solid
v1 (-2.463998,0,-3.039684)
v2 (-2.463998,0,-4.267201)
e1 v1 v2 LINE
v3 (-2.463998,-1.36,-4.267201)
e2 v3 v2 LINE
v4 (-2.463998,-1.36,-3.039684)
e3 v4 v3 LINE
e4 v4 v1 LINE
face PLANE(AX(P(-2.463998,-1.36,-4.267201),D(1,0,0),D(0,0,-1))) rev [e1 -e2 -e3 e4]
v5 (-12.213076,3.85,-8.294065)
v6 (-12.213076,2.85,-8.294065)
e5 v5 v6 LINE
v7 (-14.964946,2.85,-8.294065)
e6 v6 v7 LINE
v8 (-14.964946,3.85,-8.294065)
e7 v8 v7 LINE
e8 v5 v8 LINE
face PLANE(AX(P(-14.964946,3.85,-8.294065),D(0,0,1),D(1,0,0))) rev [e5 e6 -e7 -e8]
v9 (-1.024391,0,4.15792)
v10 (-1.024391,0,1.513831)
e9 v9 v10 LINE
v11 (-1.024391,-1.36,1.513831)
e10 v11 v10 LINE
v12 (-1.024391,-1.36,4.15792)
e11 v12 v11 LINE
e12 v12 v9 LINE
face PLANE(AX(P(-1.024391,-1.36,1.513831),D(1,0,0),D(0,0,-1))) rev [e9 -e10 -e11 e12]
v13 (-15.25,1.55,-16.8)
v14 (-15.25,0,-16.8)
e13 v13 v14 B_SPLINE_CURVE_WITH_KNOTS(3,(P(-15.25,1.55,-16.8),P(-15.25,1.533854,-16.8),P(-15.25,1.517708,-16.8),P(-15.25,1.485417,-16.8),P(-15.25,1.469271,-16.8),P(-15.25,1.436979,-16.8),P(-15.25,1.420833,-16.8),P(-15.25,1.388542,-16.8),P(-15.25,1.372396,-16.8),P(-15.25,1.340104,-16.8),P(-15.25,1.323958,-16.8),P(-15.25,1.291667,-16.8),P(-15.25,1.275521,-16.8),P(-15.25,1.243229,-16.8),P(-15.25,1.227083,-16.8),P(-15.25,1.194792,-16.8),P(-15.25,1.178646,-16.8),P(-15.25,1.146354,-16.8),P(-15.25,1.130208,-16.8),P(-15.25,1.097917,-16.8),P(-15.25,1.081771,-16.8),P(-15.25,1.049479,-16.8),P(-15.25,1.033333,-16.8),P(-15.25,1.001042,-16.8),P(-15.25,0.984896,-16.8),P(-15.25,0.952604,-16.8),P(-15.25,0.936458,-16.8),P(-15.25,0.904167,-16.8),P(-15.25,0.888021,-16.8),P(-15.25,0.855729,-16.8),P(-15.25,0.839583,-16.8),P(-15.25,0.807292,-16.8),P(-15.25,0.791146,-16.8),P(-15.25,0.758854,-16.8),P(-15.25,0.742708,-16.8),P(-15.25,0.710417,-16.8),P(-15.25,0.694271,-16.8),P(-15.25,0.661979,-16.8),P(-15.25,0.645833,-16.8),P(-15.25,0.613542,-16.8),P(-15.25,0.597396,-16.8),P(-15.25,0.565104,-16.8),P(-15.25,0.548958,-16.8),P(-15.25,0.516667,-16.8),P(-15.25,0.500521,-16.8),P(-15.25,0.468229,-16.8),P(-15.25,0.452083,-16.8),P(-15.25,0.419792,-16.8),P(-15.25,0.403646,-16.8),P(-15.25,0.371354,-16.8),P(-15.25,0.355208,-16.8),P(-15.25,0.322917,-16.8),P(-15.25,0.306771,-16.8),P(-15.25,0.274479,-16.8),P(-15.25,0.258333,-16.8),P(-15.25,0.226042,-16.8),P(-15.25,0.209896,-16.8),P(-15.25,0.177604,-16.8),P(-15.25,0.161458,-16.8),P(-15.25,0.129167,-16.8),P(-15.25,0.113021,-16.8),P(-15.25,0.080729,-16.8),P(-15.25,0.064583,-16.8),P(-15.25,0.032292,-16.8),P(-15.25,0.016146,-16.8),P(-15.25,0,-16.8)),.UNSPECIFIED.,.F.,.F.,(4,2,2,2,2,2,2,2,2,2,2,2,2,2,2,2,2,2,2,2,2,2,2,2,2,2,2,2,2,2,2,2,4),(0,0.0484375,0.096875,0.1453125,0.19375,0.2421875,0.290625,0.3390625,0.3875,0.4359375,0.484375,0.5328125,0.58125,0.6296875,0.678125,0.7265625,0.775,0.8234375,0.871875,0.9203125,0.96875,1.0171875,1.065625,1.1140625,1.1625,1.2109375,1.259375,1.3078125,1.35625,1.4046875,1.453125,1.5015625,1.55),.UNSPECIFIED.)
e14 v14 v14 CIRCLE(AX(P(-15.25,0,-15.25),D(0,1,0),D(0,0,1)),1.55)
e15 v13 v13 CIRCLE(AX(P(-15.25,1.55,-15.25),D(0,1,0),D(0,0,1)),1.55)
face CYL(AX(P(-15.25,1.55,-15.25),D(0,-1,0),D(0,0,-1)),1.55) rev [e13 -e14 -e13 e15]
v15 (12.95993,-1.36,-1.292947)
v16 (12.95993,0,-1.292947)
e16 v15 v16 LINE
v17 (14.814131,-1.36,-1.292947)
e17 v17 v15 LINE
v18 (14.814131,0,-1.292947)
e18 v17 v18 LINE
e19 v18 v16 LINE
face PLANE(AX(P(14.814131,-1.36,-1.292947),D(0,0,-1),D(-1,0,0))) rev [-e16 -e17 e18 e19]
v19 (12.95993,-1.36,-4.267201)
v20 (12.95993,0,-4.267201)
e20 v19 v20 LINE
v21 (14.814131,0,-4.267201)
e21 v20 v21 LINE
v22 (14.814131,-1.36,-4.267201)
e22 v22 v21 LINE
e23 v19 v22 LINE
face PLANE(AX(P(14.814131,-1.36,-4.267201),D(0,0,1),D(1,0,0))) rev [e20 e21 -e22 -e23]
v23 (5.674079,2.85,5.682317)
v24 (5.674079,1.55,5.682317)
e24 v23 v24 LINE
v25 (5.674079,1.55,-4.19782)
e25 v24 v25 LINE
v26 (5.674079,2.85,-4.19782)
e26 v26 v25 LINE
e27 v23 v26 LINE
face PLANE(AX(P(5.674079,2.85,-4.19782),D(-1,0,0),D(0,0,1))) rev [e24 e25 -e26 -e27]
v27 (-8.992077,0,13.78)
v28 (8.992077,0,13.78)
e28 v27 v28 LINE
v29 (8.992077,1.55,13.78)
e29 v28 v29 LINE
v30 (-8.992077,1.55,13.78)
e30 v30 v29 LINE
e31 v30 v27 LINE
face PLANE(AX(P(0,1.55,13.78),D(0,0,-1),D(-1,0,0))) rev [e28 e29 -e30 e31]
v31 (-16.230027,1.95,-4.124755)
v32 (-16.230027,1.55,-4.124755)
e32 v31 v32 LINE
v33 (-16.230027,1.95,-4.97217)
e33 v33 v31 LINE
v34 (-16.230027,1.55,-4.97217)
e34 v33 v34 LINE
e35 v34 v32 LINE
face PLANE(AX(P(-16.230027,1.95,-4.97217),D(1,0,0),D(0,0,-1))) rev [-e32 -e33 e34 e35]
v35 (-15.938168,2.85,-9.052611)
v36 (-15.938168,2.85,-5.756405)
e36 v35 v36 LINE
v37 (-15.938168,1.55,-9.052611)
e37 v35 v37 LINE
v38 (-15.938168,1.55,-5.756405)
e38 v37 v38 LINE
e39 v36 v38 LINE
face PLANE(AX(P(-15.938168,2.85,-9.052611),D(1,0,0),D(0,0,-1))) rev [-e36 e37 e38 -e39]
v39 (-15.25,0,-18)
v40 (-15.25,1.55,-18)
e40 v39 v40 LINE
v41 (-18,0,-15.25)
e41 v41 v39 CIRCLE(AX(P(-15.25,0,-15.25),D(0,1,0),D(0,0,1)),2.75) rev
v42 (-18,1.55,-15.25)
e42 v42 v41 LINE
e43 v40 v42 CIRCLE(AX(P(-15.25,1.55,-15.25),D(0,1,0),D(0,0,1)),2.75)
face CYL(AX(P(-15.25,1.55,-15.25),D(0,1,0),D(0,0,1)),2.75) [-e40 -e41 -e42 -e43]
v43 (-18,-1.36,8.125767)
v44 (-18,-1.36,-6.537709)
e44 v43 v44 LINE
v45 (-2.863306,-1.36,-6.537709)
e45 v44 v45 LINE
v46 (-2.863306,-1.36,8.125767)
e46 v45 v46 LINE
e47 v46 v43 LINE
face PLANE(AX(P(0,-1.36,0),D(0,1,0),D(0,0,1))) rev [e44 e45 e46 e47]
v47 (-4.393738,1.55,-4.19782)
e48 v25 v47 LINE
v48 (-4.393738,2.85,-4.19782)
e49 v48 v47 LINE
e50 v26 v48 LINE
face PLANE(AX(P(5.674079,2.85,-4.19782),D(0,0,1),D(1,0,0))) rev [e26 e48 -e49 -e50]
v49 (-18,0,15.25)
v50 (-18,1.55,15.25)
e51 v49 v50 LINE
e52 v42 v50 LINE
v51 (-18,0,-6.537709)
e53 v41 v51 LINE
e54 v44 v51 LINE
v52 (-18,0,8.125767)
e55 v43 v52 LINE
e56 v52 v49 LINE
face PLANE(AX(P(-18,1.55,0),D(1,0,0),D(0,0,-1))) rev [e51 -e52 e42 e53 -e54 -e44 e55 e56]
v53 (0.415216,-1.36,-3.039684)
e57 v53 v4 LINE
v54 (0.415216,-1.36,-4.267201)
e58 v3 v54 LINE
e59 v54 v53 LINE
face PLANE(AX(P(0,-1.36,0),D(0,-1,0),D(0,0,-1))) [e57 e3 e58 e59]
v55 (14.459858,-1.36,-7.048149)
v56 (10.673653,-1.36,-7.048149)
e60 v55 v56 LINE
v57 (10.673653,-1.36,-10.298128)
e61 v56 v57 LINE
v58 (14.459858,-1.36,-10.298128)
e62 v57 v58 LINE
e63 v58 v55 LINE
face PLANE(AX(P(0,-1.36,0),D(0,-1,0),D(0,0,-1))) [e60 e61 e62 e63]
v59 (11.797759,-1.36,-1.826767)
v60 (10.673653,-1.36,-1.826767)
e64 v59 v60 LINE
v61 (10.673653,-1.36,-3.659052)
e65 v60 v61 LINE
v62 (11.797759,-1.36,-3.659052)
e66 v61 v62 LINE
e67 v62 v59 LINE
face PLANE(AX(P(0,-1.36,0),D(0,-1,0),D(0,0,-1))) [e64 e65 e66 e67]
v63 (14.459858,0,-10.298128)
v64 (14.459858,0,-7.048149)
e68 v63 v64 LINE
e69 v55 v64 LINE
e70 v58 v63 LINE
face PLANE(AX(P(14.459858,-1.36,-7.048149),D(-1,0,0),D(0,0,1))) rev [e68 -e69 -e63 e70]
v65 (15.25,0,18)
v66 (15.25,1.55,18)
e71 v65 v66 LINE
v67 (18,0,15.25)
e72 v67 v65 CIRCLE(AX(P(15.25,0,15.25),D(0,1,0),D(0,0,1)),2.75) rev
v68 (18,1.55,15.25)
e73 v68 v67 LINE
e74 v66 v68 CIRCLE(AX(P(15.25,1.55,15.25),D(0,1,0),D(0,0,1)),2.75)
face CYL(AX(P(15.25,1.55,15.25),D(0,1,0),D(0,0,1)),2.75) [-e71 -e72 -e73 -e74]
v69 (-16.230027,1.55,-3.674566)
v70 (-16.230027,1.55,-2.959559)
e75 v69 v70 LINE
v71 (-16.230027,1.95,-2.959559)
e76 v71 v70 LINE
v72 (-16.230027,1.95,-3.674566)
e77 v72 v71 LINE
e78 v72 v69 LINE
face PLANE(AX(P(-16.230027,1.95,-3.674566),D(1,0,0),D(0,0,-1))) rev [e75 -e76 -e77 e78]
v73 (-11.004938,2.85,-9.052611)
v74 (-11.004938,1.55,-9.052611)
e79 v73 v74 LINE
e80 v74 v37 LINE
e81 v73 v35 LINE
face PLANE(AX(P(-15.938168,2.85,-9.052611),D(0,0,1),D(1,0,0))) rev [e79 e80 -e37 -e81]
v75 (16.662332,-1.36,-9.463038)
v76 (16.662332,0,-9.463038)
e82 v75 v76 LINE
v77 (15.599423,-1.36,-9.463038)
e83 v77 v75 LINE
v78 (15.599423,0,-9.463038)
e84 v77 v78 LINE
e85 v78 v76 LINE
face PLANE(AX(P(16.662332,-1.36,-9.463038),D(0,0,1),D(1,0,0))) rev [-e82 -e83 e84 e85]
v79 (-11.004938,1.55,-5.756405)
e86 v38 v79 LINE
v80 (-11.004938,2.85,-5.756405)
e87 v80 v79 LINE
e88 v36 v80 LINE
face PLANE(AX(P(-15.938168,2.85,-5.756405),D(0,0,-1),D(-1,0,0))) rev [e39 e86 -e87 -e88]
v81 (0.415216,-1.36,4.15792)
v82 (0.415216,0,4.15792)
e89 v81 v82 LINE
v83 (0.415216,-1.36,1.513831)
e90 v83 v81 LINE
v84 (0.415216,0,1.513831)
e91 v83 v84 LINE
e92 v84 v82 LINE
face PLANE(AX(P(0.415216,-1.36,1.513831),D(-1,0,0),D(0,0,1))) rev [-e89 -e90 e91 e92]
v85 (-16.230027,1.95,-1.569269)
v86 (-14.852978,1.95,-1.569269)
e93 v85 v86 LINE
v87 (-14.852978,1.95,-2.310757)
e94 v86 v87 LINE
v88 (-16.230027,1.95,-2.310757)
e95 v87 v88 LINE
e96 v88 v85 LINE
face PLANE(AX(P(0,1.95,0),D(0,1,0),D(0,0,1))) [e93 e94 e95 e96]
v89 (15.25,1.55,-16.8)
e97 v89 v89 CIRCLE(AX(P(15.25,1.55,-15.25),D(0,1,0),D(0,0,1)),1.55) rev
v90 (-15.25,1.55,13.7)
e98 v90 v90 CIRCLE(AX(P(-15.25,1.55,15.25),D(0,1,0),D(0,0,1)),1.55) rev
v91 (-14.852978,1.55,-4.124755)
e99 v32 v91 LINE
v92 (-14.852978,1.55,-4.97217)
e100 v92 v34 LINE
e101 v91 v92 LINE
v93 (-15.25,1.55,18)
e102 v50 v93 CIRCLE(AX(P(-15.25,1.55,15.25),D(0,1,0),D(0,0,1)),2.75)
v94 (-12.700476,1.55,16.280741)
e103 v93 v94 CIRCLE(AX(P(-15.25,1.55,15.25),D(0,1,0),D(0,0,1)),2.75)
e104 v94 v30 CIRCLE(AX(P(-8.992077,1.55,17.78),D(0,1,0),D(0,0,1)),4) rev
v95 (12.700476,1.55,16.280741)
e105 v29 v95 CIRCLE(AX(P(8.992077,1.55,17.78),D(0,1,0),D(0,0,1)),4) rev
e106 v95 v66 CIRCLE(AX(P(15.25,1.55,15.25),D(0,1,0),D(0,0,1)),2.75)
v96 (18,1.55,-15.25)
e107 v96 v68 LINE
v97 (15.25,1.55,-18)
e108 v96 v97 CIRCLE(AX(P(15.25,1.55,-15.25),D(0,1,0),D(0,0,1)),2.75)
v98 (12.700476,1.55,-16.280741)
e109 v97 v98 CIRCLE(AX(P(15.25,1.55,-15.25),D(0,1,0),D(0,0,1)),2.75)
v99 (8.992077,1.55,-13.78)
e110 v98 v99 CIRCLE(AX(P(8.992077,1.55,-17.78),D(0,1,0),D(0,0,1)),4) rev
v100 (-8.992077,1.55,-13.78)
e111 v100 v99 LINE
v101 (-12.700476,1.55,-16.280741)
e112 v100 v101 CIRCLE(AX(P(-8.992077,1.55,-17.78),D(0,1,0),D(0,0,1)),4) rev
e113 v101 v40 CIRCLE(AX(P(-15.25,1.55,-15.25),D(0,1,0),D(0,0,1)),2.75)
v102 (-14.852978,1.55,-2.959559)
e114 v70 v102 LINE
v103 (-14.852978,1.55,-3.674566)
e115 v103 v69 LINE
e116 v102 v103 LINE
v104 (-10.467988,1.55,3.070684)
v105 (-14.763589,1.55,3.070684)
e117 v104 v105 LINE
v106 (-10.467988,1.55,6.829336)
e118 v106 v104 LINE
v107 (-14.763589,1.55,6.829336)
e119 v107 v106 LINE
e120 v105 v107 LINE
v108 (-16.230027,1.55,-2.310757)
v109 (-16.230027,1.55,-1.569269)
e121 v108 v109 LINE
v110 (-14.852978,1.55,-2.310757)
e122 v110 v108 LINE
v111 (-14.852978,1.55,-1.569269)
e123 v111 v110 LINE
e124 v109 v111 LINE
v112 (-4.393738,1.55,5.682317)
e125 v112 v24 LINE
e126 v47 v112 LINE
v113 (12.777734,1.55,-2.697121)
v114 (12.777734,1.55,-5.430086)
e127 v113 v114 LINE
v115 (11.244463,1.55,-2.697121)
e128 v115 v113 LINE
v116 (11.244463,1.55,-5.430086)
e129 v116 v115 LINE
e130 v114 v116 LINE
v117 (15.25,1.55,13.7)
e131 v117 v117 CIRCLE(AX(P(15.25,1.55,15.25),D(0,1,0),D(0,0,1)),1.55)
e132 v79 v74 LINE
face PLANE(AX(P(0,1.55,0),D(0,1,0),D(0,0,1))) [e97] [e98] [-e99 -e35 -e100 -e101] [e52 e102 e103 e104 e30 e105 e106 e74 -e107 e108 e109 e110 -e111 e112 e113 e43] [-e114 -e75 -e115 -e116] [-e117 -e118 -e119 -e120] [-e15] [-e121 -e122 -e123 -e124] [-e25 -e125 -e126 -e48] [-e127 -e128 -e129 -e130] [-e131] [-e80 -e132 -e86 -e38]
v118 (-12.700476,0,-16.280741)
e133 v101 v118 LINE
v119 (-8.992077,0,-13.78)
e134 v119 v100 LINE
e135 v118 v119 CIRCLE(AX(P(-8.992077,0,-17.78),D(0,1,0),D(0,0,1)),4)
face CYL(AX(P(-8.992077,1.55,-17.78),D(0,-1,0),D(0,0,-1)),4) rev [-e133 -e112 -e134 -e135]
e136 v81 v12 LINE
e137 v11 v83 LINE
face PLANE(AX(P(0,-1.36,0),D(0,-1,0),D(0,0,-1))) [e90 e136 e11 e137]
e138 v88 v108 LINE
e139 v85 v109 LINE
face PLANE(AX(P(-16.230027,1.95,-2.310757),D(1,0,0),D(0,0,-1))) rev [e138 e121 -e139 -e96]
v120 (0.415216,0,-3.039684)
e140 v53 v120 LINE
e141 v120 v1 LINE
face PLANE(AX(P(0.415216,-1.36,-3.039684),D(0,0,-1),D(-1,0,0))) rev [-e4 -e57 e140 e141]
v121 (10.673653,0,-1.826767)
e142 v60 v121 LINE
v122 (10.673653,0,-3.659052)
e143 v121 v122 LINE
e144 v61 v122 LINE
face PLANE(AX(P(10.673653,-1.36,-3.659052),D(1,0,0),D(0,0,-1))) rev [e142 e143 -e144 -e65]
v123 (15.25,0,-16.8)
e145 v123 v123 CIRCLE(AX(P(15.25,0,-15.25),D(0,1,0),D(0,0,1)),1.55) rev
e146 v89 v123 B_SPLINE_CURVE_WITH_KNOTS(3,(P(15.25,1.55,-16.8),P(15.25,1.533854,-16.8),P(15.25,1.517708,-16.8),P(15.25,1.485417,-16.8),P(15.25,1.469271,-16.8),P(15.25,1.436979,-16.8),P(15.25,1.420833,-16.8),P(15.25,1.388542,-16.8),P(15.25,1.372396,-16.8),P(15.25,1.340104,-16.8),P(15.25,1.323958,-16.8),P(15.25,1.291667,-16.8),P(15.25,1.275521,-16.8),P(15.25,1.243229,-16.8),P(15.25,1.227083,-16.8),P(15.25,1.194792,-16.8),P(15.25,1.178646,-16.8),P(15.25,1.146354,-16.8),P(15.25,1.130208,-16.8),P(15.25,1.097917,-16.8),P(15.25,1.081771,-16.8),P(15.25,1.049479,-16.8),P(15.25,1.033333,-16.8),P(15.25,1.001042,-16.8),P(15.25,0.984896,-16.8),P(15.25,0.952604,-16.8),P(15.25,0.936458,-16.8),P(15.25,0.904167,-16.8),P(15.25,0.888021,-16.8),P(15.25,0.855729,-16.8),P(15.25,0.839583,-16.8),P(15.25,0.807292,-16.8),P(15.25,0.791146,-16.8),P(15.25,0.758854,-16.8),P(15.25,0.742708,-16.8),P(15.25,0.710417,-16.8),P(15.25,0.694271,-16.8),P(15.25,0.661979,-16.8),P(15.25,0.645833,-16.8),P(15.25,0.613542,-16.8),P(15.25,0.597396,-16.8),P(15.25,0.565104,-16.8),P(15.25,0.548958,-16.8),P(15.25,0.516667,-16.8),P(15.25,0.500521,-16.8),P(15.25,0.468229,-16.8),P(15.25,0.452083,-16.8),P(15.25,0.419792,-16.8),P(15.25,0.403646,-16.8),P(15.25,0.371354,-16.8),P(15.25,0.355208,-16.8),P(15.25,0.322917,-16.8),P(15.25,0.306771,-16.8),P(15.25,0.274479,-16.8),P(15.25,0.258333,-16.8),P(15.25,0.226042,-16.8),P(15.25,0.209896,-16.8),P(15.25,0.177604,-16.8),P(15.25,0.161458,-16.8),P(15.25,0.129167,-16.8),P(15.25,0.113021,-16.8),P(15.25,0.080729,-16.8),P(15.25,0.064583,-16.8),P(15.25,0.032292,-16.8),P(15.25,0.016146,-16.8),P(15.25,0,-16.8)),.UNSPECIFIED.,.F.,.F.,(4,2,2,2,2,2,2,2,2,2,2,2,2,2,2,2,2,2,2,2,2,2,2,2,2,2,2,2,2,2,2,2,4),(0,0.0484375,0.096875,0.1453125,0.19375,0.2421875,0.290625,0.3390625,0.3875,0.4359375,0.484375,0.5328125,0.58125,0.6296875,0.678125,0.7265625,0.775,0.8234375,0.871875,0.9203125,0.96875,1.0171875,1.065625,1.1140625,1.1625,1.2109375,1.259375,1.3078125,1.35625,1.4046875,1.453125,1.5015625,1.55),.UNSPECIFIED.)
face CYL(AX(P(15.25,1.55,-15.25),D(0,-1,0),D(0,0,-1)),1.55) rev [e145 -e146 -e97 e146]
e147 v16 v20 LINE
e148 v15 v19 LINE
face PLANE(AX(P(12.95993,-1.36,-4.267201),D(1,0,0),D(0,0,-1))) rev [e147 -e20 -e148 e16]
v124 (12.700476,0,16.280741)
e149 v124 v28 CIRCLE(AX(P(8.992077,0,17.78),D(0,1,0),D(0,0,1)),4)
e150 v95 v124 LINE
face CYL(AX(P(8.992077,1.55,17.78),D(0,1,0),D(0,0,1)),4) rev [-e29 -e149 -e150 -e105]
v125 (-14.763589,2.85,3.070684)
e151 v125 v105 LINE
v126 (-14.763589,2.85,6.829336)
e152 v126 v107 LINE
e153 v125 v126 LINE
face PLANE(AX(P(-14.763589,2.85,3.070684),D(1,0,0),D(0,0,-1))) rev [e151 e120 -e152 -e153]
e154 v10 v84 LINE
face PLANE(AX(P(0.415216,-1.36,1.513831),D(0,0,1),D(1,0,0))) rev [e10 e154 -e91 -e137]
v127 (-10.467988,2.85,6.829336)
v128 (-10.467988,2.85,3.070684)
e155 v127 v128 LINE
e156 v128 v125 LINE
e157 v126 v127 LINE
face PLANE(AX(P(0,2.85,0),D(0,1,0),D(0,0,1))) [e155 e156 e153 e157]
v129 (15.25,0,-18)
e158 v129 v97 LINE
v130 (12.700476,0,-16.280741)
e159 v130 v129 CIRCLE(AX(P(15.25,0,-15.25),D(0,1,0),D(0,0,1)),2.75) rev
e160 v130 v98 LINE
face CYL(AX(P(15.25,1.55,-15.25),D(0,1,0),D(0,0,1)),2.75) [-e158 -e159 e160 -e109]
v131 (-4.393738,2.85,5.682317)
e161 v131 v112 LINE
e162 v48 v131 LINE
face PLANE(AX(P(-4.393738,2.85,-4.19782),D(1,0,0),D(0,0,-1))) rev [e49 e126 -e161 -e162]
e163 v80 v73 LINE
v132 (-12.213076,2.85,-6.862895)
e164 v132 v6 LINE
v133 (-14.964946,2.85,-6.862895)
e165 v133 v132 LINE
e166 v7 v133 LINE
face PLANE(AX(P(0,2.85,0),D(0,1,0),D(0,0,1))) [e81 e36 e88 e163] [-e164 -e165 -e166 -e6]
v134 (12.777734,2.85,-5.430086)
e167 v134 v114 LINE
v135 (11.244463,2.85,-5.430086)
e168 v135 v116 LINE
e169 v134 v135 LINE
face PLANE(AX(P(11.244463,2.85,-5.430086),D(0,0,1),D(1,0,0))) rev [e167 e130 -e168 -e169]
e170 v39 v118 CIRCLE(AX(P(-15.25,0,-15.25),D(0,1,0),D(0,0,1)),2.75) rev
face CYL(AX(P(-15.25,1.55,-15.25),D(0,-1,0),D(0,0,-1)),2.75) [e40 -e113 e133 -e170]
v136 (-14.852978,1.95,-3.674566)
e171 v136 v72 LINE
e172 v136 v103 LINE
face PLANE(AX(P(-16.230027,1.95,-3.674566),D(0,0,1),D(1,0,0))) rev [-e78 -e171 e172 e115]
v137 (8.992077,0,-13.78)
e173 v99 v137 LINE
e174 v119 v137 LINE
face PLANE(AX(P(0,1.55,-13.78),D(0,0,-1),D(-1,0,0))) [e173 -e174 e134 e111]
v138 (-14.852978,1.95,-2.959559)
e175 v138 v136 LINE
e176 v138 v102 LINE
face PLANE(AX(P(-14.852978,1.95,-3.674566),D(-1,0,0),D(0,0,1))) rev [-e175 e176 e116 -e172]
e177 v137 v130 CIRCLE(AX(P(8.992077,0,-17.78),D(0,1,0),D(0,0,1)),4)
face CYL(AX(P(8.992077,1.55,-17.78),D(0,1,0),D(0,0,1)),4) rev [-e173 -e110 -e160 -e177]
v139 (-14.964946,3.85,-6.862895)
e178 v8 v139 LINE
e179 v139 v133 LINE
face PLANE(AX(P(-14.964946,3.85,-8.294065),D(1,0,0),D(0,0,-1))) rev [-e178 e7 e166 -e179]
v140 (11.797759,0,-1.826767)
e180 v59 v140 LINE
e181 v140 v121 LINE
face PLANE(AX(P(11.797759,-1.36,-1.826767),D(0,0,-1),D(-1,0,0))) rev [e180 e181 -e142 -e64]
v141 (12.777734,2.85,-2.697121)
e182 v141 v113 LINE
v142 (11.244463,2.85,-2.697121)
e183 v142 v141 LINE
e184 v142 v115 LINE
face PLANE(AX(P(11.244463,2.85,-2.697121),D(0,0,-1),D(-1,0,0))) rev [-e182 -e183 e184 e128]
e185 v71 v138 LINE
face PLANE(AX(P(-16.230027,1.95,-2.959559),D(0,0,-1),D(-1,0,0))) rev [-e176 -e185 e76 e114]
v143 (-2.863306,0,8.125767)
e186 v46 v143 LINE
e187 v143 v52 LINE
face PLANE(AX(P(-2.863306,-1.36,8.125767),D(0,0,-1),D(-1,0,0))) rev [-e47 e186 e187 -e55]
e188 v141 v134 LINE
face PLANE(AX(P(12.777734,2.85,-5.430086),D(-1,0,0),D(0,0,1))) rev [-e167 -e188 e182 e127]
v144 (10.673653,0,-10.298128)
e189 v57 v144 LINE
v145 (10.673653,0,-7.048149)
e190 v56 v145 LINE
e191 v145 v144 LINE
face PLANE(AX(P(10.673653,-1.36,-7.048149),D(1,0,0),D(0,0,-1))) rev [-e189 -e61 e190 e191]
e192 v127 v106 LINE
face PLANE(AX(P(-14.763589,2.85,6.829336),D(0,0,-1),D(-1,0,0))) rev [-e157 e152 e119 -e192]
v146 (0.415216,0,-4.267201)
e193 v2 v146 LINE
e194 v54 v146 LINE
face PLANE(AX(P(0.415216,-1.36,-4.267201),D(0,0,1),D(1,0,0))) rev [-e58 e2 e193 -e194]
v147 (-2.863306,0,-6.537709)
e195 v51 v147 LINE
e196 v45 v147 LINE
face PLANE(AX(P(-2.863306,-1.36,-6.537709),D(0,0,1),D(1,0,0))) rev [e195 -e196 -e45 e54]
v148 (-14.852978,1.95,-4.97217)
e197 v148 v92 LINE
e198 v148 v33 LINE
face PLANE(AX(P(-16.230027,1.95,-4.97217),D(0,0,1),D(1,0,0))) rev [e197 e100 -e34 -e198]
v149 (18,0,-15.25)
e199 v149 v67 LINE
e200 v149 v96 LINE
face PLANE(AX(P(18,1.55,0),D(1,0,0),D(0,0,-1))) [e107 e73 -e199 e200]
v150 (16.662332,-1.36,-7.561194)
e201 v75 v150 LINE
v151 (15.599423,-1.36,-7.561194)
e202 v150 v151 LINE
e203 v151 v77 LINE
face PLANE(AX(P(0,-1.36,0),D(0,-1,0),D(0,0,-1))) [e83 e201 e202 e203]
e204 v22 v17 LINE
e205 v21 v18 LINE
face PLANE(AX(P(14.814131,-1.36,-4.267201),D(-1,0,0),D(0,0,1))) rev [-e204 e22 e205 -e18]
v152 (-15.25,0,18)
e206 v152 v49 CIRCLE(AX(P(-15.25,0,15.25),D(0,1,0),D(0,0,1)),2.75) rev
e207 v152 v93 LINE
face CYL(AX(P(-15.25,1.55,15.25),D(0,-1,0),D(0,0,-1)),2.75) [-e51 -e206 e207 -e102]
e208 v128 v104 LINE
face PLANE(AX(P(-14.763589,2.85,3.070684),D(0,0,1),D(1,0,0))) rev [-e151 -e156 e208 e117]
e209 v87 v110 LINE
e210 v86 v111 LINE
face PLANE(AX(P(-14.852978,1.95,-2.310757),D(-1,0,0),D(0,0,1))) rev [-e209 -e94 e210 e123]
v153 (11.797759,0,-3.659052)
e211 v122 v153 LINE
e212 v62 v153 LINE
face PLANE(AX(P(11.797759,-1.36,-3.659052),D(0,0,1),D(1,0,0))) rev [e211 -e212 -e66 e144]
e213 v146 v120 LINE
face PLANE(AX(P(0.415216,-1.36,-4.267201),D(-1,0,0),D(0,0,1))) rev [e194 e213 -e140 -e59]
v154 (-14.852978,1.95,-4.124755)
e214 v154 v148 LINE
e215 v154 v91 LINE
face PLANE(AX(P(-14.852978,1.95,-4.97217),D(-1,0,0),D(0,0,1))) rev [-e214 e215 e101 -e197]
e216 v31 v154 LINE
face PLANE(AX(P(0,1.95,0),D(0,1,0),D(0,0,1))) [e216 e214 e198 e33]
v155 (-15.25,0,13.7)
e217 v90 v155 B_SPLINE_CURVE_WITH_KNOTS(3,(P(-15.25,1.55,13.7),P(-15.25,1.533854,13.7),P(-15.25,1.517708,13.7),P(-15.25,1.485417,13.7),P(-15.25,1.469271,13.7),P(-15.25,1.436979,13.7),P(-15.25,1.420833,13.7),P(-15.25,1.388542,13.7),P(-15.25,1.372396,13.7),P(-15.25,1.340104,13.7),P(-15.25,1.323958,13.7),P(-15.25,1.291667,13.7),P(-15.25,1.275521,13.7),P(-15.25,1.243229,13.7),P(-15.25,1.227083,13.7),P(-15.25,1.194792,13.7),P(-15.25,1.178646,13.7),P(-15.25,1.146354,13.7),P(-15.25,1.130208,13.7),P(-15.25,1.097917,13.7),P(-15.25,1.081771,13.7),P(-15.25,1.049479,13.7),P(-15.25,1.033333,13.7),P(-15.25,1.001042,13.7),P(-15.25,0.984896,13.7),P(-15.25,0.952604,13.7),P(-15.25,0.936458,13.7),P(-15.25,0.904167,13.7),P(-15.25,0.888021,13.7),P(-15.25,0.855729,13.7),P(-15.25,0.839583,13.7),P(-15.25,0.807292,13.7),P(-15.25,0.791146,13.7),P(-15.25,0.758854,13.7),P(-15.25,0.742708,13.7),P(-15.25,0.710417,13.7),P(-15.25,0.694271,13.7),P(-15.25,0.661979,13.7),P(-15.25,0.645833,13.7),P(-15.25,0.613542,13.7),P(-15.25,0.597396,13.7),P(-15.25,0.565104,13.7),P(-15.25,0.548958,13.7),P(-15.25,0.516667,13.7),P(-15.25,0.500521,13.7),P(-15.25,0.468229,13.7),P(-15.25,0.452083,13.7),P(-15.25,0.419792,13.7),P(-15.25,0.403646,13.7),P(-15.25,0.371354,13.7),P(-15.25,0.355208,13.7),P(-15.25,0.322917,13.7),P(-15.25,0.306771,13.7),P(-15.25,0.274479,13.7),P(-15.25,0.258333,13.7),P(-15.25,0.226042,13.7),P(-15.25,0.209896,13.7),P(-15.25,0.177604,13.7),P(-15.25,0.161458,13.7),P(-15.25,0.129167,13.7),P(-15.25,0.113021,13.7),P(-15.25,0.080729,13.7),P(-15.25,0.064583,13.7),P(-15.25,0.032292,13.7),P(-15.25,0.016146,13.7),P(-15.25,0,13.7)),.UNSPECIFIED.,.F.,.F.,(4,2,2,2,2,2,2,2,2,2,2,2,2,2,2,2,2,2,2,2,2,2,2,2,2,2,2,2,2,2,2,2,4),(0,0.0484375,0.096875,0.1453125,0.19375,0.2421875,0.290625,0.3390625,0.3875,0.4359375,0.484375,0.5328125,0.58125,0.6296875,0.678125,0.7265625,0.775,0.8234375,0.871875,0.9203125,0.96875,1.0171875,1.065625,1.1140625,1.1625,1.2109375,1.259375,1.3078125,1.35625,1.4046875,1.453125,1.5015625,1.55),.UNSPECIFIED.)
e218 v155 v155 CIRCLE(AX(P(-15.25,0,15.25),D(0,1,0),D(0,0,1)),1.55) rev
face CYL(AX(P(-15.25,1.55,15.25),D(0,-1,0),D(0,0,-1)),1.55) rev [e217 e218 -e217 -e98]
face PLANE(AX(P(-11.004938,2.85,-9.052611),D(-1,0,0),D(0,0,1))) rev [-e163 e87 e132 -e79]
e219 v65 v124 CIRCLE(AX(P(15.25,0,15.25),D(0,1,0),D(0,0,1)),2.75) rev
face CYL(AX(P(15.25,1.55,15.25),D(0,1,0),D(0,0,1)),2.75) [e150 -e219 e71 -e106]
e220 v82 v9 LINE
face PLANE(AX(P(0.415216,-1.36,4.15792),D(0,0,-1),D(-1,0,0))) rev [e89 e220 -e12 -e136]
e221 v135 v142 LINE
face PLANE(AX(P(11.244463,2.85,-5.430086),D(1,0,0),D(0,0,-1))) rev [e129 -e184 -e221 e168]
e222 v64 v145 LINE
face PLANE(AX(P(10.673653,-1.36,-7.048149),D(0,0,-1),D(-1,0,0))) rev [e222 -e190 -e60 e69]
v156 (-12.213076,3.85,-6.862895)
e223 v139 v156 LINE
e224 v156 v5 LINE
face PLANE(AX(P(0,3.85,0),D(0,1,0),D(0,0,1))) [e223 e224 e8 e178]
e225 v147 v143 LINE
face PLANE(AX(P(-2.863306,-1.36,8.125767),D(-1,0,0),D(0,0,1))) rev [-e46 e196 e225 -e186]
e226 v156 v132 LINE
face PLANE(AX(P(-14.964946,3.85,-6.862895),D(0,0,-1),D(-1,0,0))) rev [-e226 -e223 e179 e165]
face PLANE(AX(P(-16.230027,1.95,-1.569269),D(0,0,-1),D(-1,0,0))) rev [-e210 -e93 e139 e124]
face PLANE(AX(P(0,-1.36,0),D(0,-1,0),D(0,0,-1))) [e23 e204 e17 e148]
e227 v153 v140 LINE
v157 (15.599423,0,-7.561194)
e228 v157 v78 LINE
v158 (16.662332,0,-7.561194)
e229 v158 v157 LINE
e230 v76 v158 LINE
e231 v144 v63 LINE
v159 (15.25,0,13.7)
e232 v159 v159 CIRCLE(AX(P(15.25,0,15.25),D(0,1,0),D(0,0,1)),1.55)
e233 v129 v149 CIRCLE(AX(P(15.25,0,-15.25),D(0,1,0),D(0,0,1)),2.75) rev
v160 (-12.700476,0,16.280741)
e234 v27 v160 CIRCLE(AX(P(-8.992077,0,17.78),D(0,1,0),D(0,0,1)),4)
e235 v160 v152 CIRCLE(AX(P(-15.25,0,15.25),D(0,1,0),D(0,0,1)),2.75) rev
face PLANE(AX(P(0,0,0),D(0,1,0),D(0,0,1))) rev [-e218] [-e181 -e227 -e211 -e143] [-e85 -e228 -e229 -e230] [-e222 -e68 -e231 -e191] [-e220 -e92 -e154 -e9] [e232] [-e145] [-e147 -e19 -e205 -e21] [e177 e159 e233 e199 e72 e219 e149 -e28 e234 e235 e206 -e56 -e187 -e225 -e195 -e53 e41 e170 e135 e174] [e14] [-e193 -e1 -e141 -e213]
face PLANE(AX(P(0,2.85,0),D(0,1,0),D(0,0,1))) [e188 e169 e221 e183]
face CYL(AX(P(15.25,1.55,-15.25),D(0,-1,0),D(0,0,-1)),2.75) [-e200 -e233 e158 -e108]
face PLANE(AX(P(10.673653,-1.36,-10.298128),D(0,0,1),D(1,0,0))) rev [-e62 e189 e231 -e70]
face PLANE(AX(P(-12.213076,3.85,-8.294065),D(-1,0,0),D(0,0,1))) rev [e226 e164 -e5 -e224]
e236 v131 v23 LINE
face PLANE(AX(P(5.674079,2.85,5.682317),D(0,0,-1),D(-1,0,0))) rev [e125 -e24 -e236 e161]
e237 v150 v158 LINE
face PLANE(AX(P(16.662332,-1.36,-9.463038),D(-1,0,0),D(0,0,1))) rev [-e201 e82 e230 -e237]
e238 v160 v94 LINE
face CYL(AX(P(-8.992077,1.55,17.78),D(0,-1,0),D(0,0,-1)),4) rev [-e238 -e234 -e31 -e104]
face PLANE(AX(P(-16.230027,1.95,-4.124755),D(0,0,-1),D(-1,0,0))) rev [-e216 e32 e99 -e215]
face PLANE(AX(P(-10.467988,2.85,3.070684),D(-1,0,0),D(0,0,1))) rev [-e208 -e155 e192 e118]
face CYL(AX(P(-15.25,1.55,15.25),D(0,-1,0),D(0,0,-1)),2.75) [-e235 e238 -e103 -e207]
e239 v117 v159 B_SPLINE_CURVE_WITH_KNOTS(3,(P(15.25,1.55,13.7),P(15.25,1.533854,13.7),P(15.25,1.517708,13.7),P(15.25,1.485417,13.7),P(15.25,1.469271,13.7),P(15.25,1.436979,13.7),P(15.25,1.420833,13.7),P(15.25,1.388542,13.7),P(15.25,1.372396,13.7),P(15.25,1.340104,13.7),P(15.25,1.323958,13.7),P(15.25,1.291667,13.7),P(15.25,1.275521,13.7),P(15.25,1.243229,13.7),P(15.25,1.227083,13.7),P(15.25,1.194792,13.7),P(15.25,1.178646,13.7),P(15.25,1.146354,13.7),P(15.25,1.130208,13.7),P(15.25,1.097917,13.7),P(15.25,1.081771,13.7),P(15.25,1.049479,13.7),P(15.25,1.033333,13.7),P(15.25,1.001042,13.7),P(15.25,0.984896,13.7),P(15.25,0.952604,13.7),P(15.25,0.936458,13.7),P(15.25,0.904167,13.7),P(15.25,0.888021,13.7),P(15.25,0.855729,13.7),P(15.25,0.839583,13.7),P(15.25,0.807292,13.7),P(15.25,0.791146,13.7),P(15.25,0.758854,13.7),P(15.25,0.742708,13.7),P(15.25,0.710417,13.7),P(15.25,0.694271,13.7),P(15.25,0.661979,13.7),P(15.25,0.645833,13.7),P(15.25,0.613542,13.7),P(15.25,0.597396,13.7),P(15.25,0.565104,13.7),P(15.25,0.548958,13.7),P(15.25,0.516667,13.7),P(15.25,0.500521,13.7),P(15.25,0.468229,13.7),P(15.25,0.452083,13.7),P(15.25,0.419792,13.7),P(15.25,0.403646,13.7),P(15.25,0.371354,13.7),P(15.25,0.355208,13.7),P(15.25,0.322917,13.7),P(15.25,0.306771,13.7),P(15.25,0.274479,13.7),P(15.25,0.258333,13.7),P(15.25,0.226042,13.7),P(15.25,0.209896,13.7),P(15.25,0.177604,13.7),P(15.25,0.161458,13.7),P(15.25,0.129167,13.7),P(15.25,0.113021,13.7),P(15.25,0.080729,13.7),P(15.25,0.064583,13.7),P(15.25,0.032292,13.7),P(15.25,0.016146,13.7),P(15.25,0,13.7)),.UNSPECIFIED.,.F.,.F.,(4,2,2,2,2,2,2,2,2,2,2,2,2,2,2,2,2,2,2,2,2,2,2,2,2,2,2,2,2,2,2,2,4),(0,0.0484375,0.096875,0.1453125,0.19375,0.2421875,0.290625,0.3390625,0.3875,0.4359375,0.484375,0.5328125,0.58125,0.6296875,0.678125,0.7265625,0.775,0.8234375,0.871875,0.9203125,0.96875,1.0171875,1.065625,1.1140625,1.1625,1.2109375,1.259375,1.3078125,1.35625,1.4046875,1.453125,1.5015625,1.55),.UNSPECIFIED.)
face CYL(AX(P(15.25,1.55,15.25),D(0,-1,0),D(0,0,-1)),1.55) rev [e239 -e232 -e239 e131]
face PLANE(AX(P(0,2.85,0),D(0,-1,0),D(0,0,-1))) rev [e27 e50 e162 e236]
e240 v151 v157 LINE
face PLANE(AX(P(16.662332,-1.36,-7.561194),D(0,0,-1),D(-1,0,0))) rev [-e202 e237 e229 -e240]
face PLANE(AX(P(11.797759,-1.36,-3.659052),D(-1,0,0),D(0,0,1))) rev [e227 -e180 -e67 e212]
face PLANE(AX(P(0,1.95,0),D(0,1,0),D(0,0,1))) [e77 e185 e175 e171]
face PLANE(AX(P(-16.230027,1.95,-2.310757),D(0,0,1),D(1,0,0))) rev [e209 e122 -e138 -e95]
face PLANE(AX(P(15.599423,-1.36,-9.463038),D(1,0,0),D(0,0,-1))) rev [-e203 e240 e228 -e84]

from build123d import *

# Parameters (mm, degrees)
SKETCH1_R           = 1.55
BOSS_EXTRUDE1_DEPTH = 1.55
FILLET1_R           = 2.75
FILLET2_R           = 4
SKETCH2_W           = 4.295601851
SKETCH2_H           = 3.758651621
SKETCH2_W_2         = 10.067816841
SKETCH2_H_2         = 9.880137001
SKETCH2_W_3         = 1.533271648
SKETCH2_H_3         = 2.732965052
SKETCH2_W_4         = 4.933230252
SKETCH2_H_4         = 3.296205995
BOSS_EXTRUDE2_DEPTH = 1.3
SKETCH3_W           = 2.751869936
SKETCH3_H           = 1.431170206
BOSS_EXTRUDE3_DEPTH = 1
SKETCH5_W           = 15.136693504
SKETCH5_H           = 14.663476204
SKETCH5_W_2         = 3.786204625
SKETCH5_H_2         = 3.249978942
SKETCH5_W_3         = 1.854200636
SKETCH5_H_3         = 2.974253985
SKETCH5_W_4         = 1.124105555
SKETCH5_H_4         = 1.832284905
SKETCH5_W_5         = 2.879214045
SKETCH5_H_5         = 1.227517325
SKETCH5_W_6         = 1.439607023
SKETCH5_H_6         = 2.644088496
SKETCH5_W_7         = 1.062909192
SKETCH5_H_7         = 1.901844146
BOSS_EXTRUDE5_DEPTH = 1.36
SKETCH6_W           = 1.377049396
SKETCH6_H           = 0.847415013
SKETCH6_H_2         = 0.715006417
SKETCH6_H_3         = 0.741488137
LED_DEPTH           = 0.4


with BuildPart() as part:
    # Sketch1 → Boss-Extrude1 (new body)
    with BuildSketch(Plane(origin=(0, 0, 0), x_dir=(1, 0, 0), z_dir=(0, 1, 0))):
        Polygon((-12.5, 18), (-18, 18), (-18, -18), (-12.5, -18), (-12.5, -13.78), (12.5, -13.78), (12.5, -18), (18, -18), (18, 18), (12.5, 18), (12.5, 13.78), (-12.5, 13.78), align=None)
        with Locations(Location((-15.25, -15.25, 0), (0, 0, 90))):
            Circle(SKETCH1_R, mode=Mode.SUBTRACT)
        with Locations(Location((15.25, -15.25, 0), (0, 0, 90))):
            Circle(SKETCH1_R, mode=Mode.SUBTRACT)
        with Locations(Location((-15.25, 15.25, 0), (0, 0, 90))):
            Circle(SKETCH1_R, mode=Mode.SUBTRACT)
        with Locations(Location((15.25, 15.25, 0), (0, 0, 90))):
            Circle(SKETCH1_R, mode=Mode.SUBTRACT)
    extrude(amount=BOSS_EXTRUDE1_DEPTH)

    # Fillet1
    fillet1_edges = [part.edges().sort_by_distance(p)[0] for p in [
        (-12.5, 0.775, -18),
        (-18, 0.775, -18),
        (-18, 0.775, 18),
        (-12.5, 0.775, 18),
        (12.5, 0.775, 18),
        (18, 0.775, 18),
        (18, 0.775, -18),
        (12.5, 0.775, -18),
    ]]
    fillet(fillet1_edges, radius=FILLET1_R - 0.0001)  # a hair under: the kernel refuses the full size

    # Fillet2
    fillet2_edges = [part.edges().sort_by_distance(p)[0] for p in [
        (12.5, 0.775, -13.78),
        (-12.5, 0.775, -13.78),
        (12.5, 0.775, 13.78),
        (-12.5, 0.775, 13.78),
    ]]
    fillet(fillet2_edges, radius=FILLET2_R)

    # Sketch2 → Boss-Extrude2 (add)
    with BuildSketch(Plane(origin=(0, 1.55, 0), x_dir=(1, 0, 0), z_dir=(0, 1, 0))):
        with Locations((-12.61578846, -4.950009947)):
            Rectangle(SKETCH2_W, SKETCH2_H)
        with Locations((0.64017038, -0.742248111)):
            Rectangle(SKETCH2_W_2, SKETCH2_H_2)
        with Locations((12.011098572, 4.06360308)):
            Rectangle(SKETCH2_W_3, SKETCH2_H_3)
        with Locations((-13.471552891, 7.404508181)):
            Rectangle(SKETCH2_W_4, SKETCH2_H_4)
    extrude(amount=BOSS_EXTRUDE2_DEPTH)

    # Sketch3 → Boss-Extrude3 (add)
    with BuildSketch(Plane(origin=(0, 2.85, 0), x_dir=(1, 0, 0), z_dir=(0, 1, 0))):
        with Locations((-13.589010754, 7.578480249)):
            Rectangle(SKETCH3_W, SKETCH3_H)
    extrude(amount=BOSS_EXTRUDE3_DEPTH)

    # Sketch5 → Boss-Extrude5 (add)
    with BuildSketch(Plane.XZ):
        with Locations((-10.431653248, 0.794028878)):
            Rectangle(SKETCH5_W, SKETCH5_H)
        with Locations((12.566755317, -8.673138409)):
            Rectangle(SKETCH5_W_2, SKETCH5_H_2)
        with Locations((13.887030707, -2.780074404)):
            Rectangle(SKETCH5_W_3, SKETCH5_H_3)
        with Locations((11.235705782, -2.742909061)):
            Rectangle(SKETCH5_W_4, SKETCH5_H_4)
        with Locations((-1.024391328, -3.653442734)):
            Rectangle(SKETCH5_W_5, SKETCH5_H_5)
        with Locations((-0.304587816, 2.835875505)):
            Rectangle(SKETCH5_W_6, SKETCH5_H_6)
        with Locations((16.130877107, -8.512116058)):
            Rectangle(SKETCH5_W_7, SKETCH5_H_7)
    extrude(amount=BOSS_EXTRUDE5_DEPTH)

    # Sketch6 → LED (add)
    with BuildSketch(Plane(origin=(0, 1.55, 0), x_dir=(1, 0, 0), z_dir=(0, 1, 0))):
        with Locations((-15.541502651, 4.54846251)):
            Rectangle(SKETCH6_W, SKETCH6_H)
        with Locations((-15.541502651, 3.317062568)):
            Rectangle(SKETCH6_W, SKETCH6_H_2)
        with Locations((-15.541502651, 1.940013173)):
            Rectangle(SKETCH6_W, SKETCH6_H_3)
    extrude(amount=LED_DEPTH)


solid = part.part
